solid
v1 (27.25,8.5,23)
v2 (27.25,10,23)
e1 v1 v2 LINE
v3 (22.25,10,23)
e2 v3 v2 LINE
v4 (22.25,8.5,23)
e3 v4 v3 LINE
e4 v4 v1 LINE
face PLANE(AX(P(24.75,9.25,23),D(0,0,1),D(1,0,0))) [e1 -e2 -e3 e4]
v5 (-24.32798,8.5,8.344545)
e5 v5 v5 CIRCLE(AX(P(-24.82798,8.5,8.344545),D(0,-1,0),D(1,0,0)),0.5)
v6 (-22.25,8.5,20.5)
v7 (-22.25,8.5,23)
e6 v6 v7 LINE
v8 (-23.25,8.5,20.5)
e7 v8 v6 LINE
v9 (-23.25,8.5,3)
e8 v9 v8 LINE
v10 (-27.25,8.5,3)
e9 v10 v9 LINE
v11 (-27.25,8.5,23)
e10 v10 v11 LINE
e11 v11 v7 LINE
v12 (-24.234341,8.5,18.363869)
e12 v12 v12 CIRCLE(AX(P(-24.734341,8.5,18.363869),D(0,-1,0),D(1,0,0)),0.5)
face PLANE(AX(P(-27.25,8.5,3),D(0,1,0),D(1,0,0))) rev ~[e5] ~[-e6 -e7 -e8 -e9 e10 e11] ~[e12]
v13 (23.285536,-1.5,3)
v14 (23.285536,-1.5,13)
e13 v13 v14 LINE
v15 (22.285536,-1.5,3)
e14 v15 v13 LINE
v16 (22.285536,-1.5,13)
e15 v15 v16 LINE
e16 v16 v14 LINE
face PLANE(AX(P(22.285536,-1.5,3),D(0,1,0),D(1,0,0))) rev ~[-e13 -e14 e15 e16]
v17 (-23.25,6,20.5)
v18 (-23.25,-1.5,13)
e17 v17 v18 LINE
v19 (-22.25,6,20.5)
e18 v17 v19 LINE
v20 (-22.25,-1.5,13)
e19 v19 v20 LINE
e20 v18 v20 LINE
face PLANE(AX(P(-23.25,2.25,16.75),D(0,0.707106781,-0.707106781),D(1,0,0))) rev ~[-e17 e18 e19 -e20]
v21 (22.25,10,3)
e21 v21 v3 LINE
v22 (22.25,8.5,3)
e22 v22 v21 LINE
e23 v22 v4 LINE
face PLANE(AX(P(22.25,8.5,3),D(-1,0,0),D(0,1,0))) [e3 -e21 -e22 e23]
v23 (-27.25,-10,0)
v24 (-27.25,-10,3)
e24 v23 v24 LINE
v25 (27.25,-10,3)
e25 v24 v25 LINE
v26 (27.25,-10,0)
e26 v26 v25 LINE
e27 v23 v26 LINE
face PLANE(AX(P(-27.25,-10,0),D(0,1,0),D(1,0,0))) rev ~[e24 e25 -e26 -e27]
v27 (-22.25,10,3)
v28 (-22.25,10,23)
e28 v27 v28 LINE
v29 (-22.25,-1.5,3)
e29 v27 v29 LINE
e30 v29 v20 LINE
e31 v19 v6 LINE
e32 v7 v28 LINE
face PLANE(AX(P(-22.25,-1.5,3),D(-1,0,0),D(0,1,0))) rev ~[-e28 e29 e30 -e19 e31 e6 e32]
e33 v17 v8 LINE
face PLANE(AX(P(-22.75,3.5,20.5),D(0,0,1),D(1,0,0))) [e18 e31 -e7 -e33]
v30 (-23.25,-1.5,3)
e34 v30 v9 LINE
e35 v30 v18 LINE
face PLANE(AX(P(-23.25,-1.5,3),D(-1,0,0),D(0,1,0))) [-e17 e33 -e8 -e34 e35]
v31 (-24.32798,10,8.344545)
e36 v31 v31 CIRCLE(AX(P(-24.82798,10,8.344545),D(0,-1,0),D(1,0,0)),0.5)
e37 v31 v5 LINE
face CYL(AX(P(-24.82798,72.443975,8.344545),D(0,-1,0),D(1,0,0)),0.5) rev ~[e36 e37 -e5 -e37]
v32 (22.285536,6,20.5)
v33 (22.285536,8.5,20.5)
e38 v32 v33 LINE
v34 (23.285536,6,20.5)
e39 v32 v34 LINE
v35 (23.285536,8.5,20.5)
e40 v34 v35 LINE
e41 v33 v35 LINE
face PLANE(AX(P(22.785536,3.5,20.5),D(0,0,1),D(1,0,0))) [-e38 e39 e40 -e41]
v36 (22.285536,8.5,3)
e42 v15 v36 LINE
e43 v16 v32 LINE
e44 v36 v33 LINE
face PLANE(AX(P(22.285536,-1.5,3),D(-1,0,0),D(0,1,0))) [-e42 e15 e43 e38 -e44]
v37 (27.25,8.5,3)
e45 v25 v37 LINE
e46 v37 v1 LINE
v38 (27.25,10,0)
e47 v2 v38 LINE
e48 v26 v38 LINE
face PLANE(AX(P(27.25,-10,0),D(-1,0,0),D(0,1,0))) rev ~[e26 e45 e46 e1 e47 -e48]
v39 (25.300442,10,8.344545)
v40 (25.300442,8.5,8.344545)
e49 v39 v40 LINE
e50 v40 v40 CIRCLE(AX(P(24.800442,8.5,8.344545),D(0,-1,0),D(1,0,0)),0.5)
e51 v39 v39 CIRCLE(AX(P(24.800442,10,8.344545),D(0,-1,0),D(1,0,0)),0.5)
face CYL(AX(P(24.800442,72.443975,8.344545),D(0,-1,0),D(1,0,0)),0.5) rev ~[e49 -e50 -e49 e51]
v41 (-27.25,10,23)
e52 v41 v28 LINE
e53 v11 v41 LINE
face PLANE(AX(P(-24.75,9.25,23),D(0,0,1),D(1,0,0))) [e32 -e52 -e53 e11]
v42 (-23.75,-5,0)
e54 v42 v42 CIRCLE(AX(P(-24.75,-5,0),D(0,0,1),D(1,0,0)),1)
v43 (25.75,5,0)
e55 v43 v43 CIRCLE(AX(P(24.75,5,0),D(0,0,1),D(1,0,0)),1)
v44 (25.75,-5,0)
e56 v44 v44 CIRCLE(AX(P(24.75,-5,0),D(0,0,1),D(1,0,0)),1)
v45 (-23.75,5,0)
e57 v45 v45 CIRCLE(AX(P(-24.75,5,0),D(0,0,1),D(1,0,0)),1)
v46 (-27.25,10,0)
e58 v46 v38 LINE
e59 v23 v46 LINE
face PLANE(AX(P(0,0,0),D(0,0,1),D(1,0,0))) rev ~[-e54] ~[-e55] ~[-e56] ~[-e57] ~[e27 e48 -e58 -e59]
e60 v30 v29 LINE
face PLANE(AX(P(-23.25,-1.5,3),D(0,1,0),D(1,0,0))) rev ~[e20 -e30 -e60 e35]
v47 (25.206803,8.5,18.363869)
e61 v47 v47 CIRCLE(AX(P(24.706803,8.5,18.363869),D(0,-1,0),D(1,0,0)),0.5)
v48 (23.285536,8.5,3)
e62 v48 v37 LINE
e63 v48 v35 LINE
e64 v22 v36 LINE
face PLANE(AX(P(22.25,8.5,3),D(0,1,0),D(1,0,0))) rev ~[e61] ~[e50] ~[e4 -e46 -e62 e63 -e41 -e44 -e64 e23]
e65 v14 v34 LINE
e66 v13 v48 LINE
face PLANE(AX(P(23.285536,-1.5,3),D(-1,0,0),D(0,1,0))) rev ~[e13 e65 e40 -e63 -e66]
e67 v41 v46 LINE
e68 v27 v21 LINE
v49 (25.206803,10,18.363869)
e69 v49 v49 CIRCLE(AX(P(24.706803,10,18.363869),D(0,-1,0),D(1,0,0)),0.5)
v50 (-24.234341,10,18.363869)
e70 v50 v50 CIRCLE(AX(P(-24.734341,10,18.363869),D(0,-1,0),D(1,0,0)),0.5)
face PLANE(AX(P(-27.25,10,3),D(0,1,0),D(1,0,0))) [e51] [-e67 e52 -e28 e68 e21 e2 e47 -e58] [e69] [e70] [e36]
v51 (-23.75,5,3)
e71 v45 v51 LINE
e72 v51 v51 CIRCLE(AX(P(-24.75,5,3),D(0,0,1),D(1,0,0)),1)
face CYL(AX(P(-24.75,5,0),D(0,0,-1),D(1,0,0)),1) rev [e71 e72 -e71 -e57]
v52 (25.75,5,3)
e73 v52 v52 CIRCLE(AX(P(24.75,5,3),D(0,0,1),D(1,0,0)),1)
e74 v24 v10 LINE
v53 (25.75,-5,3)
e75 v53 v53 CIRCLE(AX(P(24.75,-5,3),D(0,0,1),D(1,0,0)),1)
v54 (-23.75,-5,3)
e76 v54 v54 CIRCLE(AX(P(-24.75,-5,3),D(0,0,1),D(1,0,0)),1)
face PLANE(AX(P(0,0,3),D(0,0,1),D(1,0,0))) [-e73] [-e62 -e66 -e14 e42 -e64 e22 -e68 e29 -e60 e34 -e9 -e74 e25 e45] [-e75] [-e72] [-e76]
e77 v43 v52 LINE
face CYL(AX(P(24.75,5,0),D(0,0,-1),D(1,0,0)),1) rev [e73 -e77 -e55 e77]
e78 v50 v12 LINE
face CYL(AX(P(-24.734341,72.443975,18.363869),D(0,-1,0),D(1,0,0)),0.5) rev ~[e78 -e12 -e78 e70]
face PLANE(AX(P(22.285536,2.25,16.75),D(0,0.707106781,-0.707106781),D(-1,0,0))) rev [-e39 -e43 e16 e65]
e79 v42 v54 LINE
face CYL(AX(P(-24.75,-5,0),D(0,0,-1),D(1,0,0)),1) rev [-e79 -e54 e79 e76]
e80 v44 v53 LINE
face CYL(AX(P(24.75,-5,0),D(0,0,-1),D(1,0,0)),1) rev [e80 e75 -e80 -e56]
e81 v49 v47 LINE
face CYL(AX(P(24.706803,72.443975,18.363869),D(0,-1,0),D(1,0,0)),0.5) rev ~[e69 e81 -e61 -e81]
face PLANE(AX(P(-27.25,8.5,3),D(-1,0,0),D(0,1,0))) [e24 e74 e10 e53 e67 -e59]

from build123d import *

# Parameters (mm, degrees)
F0_W     = 54.5
F0_H     = 20
F0_R     = 1
F1_DEPTH = 3
F2_W     = 5
F2_H     = 1.5
F3_DEPTH = 20
F4_W     = 1
F4_H     = 10
F5_DEPTH = 17.5
F6_SIZE  = 7.5
F8_D     = 1


# Not quite as in the source:
# - a feature names something its author has since deleted; it is built from what else it names


with BuildPart() as f1:
    # F0 (on Top) → F1 (new body)
    with BuildSketch(Plane.XY):
        Rectangle(F0_W, F0_H)
        with Locations((-24.75, -5)):
            Circle(F0_R, mode=Mode.SUBTRACT)
        with Locations((24.75, -5)):
            Circle(F0_R, mode=Mode.SUBTRACT)
        with Locations((-24.75, 5)):
            Circle(F0_R, mode=Mode.SUBTRACT)
        with Locations((24.75, 5)):
            Circle(F0_R, mode=Mode.SUBTRACT)
    extrude(amount=F1_DEPTH)

    # F2 (on face) → F3 (join)
    with BuildSketch(Plane.XY.offset(3)):
        with Locations((-24.75, 9.25)):
            Rectangle(F2_W, F2_H)
        with Locations((24.75, 9.25)):
            Rectangle(F2_W, F2_H)
    extrude(amount=F3_DEPTH)

    # F4 (on face) → F5 (join)
    with BuildSketch(Plane.XY.offset(3)):
        with Locations((-22.75, 3.5)):
            Rectangle(F4_W, F4_H)
        with Locations((22.7855359316, 3.5)):
            Rectangle(F4_W, F4_H)
    extrude(amount=F5_DEPTH)

    # F6
    f6_edges = [f1.edges().sort_by_distance(p)[0] for p in [
        (-22.75, -1.5, 20.5),
        (22.785536, -1.5, 20.5),
    ]]
    chamfer(f6_edges, length=F6_SIZE)

    # F8 (through all)
    with Locations(Plane(origin=(0, 10, 0), x_dir=(-1, 0, 0), z_dir=(0, 1, 0))):
        with Locations((24.8279795051, 8.3445450291), (24.7343406081, 18.3638688177), (-24.8004421592, 8.3445450291), (-24.7068032622, 18.3638688177)):
            Hole(F8_D / 2)


solid = f1.part
